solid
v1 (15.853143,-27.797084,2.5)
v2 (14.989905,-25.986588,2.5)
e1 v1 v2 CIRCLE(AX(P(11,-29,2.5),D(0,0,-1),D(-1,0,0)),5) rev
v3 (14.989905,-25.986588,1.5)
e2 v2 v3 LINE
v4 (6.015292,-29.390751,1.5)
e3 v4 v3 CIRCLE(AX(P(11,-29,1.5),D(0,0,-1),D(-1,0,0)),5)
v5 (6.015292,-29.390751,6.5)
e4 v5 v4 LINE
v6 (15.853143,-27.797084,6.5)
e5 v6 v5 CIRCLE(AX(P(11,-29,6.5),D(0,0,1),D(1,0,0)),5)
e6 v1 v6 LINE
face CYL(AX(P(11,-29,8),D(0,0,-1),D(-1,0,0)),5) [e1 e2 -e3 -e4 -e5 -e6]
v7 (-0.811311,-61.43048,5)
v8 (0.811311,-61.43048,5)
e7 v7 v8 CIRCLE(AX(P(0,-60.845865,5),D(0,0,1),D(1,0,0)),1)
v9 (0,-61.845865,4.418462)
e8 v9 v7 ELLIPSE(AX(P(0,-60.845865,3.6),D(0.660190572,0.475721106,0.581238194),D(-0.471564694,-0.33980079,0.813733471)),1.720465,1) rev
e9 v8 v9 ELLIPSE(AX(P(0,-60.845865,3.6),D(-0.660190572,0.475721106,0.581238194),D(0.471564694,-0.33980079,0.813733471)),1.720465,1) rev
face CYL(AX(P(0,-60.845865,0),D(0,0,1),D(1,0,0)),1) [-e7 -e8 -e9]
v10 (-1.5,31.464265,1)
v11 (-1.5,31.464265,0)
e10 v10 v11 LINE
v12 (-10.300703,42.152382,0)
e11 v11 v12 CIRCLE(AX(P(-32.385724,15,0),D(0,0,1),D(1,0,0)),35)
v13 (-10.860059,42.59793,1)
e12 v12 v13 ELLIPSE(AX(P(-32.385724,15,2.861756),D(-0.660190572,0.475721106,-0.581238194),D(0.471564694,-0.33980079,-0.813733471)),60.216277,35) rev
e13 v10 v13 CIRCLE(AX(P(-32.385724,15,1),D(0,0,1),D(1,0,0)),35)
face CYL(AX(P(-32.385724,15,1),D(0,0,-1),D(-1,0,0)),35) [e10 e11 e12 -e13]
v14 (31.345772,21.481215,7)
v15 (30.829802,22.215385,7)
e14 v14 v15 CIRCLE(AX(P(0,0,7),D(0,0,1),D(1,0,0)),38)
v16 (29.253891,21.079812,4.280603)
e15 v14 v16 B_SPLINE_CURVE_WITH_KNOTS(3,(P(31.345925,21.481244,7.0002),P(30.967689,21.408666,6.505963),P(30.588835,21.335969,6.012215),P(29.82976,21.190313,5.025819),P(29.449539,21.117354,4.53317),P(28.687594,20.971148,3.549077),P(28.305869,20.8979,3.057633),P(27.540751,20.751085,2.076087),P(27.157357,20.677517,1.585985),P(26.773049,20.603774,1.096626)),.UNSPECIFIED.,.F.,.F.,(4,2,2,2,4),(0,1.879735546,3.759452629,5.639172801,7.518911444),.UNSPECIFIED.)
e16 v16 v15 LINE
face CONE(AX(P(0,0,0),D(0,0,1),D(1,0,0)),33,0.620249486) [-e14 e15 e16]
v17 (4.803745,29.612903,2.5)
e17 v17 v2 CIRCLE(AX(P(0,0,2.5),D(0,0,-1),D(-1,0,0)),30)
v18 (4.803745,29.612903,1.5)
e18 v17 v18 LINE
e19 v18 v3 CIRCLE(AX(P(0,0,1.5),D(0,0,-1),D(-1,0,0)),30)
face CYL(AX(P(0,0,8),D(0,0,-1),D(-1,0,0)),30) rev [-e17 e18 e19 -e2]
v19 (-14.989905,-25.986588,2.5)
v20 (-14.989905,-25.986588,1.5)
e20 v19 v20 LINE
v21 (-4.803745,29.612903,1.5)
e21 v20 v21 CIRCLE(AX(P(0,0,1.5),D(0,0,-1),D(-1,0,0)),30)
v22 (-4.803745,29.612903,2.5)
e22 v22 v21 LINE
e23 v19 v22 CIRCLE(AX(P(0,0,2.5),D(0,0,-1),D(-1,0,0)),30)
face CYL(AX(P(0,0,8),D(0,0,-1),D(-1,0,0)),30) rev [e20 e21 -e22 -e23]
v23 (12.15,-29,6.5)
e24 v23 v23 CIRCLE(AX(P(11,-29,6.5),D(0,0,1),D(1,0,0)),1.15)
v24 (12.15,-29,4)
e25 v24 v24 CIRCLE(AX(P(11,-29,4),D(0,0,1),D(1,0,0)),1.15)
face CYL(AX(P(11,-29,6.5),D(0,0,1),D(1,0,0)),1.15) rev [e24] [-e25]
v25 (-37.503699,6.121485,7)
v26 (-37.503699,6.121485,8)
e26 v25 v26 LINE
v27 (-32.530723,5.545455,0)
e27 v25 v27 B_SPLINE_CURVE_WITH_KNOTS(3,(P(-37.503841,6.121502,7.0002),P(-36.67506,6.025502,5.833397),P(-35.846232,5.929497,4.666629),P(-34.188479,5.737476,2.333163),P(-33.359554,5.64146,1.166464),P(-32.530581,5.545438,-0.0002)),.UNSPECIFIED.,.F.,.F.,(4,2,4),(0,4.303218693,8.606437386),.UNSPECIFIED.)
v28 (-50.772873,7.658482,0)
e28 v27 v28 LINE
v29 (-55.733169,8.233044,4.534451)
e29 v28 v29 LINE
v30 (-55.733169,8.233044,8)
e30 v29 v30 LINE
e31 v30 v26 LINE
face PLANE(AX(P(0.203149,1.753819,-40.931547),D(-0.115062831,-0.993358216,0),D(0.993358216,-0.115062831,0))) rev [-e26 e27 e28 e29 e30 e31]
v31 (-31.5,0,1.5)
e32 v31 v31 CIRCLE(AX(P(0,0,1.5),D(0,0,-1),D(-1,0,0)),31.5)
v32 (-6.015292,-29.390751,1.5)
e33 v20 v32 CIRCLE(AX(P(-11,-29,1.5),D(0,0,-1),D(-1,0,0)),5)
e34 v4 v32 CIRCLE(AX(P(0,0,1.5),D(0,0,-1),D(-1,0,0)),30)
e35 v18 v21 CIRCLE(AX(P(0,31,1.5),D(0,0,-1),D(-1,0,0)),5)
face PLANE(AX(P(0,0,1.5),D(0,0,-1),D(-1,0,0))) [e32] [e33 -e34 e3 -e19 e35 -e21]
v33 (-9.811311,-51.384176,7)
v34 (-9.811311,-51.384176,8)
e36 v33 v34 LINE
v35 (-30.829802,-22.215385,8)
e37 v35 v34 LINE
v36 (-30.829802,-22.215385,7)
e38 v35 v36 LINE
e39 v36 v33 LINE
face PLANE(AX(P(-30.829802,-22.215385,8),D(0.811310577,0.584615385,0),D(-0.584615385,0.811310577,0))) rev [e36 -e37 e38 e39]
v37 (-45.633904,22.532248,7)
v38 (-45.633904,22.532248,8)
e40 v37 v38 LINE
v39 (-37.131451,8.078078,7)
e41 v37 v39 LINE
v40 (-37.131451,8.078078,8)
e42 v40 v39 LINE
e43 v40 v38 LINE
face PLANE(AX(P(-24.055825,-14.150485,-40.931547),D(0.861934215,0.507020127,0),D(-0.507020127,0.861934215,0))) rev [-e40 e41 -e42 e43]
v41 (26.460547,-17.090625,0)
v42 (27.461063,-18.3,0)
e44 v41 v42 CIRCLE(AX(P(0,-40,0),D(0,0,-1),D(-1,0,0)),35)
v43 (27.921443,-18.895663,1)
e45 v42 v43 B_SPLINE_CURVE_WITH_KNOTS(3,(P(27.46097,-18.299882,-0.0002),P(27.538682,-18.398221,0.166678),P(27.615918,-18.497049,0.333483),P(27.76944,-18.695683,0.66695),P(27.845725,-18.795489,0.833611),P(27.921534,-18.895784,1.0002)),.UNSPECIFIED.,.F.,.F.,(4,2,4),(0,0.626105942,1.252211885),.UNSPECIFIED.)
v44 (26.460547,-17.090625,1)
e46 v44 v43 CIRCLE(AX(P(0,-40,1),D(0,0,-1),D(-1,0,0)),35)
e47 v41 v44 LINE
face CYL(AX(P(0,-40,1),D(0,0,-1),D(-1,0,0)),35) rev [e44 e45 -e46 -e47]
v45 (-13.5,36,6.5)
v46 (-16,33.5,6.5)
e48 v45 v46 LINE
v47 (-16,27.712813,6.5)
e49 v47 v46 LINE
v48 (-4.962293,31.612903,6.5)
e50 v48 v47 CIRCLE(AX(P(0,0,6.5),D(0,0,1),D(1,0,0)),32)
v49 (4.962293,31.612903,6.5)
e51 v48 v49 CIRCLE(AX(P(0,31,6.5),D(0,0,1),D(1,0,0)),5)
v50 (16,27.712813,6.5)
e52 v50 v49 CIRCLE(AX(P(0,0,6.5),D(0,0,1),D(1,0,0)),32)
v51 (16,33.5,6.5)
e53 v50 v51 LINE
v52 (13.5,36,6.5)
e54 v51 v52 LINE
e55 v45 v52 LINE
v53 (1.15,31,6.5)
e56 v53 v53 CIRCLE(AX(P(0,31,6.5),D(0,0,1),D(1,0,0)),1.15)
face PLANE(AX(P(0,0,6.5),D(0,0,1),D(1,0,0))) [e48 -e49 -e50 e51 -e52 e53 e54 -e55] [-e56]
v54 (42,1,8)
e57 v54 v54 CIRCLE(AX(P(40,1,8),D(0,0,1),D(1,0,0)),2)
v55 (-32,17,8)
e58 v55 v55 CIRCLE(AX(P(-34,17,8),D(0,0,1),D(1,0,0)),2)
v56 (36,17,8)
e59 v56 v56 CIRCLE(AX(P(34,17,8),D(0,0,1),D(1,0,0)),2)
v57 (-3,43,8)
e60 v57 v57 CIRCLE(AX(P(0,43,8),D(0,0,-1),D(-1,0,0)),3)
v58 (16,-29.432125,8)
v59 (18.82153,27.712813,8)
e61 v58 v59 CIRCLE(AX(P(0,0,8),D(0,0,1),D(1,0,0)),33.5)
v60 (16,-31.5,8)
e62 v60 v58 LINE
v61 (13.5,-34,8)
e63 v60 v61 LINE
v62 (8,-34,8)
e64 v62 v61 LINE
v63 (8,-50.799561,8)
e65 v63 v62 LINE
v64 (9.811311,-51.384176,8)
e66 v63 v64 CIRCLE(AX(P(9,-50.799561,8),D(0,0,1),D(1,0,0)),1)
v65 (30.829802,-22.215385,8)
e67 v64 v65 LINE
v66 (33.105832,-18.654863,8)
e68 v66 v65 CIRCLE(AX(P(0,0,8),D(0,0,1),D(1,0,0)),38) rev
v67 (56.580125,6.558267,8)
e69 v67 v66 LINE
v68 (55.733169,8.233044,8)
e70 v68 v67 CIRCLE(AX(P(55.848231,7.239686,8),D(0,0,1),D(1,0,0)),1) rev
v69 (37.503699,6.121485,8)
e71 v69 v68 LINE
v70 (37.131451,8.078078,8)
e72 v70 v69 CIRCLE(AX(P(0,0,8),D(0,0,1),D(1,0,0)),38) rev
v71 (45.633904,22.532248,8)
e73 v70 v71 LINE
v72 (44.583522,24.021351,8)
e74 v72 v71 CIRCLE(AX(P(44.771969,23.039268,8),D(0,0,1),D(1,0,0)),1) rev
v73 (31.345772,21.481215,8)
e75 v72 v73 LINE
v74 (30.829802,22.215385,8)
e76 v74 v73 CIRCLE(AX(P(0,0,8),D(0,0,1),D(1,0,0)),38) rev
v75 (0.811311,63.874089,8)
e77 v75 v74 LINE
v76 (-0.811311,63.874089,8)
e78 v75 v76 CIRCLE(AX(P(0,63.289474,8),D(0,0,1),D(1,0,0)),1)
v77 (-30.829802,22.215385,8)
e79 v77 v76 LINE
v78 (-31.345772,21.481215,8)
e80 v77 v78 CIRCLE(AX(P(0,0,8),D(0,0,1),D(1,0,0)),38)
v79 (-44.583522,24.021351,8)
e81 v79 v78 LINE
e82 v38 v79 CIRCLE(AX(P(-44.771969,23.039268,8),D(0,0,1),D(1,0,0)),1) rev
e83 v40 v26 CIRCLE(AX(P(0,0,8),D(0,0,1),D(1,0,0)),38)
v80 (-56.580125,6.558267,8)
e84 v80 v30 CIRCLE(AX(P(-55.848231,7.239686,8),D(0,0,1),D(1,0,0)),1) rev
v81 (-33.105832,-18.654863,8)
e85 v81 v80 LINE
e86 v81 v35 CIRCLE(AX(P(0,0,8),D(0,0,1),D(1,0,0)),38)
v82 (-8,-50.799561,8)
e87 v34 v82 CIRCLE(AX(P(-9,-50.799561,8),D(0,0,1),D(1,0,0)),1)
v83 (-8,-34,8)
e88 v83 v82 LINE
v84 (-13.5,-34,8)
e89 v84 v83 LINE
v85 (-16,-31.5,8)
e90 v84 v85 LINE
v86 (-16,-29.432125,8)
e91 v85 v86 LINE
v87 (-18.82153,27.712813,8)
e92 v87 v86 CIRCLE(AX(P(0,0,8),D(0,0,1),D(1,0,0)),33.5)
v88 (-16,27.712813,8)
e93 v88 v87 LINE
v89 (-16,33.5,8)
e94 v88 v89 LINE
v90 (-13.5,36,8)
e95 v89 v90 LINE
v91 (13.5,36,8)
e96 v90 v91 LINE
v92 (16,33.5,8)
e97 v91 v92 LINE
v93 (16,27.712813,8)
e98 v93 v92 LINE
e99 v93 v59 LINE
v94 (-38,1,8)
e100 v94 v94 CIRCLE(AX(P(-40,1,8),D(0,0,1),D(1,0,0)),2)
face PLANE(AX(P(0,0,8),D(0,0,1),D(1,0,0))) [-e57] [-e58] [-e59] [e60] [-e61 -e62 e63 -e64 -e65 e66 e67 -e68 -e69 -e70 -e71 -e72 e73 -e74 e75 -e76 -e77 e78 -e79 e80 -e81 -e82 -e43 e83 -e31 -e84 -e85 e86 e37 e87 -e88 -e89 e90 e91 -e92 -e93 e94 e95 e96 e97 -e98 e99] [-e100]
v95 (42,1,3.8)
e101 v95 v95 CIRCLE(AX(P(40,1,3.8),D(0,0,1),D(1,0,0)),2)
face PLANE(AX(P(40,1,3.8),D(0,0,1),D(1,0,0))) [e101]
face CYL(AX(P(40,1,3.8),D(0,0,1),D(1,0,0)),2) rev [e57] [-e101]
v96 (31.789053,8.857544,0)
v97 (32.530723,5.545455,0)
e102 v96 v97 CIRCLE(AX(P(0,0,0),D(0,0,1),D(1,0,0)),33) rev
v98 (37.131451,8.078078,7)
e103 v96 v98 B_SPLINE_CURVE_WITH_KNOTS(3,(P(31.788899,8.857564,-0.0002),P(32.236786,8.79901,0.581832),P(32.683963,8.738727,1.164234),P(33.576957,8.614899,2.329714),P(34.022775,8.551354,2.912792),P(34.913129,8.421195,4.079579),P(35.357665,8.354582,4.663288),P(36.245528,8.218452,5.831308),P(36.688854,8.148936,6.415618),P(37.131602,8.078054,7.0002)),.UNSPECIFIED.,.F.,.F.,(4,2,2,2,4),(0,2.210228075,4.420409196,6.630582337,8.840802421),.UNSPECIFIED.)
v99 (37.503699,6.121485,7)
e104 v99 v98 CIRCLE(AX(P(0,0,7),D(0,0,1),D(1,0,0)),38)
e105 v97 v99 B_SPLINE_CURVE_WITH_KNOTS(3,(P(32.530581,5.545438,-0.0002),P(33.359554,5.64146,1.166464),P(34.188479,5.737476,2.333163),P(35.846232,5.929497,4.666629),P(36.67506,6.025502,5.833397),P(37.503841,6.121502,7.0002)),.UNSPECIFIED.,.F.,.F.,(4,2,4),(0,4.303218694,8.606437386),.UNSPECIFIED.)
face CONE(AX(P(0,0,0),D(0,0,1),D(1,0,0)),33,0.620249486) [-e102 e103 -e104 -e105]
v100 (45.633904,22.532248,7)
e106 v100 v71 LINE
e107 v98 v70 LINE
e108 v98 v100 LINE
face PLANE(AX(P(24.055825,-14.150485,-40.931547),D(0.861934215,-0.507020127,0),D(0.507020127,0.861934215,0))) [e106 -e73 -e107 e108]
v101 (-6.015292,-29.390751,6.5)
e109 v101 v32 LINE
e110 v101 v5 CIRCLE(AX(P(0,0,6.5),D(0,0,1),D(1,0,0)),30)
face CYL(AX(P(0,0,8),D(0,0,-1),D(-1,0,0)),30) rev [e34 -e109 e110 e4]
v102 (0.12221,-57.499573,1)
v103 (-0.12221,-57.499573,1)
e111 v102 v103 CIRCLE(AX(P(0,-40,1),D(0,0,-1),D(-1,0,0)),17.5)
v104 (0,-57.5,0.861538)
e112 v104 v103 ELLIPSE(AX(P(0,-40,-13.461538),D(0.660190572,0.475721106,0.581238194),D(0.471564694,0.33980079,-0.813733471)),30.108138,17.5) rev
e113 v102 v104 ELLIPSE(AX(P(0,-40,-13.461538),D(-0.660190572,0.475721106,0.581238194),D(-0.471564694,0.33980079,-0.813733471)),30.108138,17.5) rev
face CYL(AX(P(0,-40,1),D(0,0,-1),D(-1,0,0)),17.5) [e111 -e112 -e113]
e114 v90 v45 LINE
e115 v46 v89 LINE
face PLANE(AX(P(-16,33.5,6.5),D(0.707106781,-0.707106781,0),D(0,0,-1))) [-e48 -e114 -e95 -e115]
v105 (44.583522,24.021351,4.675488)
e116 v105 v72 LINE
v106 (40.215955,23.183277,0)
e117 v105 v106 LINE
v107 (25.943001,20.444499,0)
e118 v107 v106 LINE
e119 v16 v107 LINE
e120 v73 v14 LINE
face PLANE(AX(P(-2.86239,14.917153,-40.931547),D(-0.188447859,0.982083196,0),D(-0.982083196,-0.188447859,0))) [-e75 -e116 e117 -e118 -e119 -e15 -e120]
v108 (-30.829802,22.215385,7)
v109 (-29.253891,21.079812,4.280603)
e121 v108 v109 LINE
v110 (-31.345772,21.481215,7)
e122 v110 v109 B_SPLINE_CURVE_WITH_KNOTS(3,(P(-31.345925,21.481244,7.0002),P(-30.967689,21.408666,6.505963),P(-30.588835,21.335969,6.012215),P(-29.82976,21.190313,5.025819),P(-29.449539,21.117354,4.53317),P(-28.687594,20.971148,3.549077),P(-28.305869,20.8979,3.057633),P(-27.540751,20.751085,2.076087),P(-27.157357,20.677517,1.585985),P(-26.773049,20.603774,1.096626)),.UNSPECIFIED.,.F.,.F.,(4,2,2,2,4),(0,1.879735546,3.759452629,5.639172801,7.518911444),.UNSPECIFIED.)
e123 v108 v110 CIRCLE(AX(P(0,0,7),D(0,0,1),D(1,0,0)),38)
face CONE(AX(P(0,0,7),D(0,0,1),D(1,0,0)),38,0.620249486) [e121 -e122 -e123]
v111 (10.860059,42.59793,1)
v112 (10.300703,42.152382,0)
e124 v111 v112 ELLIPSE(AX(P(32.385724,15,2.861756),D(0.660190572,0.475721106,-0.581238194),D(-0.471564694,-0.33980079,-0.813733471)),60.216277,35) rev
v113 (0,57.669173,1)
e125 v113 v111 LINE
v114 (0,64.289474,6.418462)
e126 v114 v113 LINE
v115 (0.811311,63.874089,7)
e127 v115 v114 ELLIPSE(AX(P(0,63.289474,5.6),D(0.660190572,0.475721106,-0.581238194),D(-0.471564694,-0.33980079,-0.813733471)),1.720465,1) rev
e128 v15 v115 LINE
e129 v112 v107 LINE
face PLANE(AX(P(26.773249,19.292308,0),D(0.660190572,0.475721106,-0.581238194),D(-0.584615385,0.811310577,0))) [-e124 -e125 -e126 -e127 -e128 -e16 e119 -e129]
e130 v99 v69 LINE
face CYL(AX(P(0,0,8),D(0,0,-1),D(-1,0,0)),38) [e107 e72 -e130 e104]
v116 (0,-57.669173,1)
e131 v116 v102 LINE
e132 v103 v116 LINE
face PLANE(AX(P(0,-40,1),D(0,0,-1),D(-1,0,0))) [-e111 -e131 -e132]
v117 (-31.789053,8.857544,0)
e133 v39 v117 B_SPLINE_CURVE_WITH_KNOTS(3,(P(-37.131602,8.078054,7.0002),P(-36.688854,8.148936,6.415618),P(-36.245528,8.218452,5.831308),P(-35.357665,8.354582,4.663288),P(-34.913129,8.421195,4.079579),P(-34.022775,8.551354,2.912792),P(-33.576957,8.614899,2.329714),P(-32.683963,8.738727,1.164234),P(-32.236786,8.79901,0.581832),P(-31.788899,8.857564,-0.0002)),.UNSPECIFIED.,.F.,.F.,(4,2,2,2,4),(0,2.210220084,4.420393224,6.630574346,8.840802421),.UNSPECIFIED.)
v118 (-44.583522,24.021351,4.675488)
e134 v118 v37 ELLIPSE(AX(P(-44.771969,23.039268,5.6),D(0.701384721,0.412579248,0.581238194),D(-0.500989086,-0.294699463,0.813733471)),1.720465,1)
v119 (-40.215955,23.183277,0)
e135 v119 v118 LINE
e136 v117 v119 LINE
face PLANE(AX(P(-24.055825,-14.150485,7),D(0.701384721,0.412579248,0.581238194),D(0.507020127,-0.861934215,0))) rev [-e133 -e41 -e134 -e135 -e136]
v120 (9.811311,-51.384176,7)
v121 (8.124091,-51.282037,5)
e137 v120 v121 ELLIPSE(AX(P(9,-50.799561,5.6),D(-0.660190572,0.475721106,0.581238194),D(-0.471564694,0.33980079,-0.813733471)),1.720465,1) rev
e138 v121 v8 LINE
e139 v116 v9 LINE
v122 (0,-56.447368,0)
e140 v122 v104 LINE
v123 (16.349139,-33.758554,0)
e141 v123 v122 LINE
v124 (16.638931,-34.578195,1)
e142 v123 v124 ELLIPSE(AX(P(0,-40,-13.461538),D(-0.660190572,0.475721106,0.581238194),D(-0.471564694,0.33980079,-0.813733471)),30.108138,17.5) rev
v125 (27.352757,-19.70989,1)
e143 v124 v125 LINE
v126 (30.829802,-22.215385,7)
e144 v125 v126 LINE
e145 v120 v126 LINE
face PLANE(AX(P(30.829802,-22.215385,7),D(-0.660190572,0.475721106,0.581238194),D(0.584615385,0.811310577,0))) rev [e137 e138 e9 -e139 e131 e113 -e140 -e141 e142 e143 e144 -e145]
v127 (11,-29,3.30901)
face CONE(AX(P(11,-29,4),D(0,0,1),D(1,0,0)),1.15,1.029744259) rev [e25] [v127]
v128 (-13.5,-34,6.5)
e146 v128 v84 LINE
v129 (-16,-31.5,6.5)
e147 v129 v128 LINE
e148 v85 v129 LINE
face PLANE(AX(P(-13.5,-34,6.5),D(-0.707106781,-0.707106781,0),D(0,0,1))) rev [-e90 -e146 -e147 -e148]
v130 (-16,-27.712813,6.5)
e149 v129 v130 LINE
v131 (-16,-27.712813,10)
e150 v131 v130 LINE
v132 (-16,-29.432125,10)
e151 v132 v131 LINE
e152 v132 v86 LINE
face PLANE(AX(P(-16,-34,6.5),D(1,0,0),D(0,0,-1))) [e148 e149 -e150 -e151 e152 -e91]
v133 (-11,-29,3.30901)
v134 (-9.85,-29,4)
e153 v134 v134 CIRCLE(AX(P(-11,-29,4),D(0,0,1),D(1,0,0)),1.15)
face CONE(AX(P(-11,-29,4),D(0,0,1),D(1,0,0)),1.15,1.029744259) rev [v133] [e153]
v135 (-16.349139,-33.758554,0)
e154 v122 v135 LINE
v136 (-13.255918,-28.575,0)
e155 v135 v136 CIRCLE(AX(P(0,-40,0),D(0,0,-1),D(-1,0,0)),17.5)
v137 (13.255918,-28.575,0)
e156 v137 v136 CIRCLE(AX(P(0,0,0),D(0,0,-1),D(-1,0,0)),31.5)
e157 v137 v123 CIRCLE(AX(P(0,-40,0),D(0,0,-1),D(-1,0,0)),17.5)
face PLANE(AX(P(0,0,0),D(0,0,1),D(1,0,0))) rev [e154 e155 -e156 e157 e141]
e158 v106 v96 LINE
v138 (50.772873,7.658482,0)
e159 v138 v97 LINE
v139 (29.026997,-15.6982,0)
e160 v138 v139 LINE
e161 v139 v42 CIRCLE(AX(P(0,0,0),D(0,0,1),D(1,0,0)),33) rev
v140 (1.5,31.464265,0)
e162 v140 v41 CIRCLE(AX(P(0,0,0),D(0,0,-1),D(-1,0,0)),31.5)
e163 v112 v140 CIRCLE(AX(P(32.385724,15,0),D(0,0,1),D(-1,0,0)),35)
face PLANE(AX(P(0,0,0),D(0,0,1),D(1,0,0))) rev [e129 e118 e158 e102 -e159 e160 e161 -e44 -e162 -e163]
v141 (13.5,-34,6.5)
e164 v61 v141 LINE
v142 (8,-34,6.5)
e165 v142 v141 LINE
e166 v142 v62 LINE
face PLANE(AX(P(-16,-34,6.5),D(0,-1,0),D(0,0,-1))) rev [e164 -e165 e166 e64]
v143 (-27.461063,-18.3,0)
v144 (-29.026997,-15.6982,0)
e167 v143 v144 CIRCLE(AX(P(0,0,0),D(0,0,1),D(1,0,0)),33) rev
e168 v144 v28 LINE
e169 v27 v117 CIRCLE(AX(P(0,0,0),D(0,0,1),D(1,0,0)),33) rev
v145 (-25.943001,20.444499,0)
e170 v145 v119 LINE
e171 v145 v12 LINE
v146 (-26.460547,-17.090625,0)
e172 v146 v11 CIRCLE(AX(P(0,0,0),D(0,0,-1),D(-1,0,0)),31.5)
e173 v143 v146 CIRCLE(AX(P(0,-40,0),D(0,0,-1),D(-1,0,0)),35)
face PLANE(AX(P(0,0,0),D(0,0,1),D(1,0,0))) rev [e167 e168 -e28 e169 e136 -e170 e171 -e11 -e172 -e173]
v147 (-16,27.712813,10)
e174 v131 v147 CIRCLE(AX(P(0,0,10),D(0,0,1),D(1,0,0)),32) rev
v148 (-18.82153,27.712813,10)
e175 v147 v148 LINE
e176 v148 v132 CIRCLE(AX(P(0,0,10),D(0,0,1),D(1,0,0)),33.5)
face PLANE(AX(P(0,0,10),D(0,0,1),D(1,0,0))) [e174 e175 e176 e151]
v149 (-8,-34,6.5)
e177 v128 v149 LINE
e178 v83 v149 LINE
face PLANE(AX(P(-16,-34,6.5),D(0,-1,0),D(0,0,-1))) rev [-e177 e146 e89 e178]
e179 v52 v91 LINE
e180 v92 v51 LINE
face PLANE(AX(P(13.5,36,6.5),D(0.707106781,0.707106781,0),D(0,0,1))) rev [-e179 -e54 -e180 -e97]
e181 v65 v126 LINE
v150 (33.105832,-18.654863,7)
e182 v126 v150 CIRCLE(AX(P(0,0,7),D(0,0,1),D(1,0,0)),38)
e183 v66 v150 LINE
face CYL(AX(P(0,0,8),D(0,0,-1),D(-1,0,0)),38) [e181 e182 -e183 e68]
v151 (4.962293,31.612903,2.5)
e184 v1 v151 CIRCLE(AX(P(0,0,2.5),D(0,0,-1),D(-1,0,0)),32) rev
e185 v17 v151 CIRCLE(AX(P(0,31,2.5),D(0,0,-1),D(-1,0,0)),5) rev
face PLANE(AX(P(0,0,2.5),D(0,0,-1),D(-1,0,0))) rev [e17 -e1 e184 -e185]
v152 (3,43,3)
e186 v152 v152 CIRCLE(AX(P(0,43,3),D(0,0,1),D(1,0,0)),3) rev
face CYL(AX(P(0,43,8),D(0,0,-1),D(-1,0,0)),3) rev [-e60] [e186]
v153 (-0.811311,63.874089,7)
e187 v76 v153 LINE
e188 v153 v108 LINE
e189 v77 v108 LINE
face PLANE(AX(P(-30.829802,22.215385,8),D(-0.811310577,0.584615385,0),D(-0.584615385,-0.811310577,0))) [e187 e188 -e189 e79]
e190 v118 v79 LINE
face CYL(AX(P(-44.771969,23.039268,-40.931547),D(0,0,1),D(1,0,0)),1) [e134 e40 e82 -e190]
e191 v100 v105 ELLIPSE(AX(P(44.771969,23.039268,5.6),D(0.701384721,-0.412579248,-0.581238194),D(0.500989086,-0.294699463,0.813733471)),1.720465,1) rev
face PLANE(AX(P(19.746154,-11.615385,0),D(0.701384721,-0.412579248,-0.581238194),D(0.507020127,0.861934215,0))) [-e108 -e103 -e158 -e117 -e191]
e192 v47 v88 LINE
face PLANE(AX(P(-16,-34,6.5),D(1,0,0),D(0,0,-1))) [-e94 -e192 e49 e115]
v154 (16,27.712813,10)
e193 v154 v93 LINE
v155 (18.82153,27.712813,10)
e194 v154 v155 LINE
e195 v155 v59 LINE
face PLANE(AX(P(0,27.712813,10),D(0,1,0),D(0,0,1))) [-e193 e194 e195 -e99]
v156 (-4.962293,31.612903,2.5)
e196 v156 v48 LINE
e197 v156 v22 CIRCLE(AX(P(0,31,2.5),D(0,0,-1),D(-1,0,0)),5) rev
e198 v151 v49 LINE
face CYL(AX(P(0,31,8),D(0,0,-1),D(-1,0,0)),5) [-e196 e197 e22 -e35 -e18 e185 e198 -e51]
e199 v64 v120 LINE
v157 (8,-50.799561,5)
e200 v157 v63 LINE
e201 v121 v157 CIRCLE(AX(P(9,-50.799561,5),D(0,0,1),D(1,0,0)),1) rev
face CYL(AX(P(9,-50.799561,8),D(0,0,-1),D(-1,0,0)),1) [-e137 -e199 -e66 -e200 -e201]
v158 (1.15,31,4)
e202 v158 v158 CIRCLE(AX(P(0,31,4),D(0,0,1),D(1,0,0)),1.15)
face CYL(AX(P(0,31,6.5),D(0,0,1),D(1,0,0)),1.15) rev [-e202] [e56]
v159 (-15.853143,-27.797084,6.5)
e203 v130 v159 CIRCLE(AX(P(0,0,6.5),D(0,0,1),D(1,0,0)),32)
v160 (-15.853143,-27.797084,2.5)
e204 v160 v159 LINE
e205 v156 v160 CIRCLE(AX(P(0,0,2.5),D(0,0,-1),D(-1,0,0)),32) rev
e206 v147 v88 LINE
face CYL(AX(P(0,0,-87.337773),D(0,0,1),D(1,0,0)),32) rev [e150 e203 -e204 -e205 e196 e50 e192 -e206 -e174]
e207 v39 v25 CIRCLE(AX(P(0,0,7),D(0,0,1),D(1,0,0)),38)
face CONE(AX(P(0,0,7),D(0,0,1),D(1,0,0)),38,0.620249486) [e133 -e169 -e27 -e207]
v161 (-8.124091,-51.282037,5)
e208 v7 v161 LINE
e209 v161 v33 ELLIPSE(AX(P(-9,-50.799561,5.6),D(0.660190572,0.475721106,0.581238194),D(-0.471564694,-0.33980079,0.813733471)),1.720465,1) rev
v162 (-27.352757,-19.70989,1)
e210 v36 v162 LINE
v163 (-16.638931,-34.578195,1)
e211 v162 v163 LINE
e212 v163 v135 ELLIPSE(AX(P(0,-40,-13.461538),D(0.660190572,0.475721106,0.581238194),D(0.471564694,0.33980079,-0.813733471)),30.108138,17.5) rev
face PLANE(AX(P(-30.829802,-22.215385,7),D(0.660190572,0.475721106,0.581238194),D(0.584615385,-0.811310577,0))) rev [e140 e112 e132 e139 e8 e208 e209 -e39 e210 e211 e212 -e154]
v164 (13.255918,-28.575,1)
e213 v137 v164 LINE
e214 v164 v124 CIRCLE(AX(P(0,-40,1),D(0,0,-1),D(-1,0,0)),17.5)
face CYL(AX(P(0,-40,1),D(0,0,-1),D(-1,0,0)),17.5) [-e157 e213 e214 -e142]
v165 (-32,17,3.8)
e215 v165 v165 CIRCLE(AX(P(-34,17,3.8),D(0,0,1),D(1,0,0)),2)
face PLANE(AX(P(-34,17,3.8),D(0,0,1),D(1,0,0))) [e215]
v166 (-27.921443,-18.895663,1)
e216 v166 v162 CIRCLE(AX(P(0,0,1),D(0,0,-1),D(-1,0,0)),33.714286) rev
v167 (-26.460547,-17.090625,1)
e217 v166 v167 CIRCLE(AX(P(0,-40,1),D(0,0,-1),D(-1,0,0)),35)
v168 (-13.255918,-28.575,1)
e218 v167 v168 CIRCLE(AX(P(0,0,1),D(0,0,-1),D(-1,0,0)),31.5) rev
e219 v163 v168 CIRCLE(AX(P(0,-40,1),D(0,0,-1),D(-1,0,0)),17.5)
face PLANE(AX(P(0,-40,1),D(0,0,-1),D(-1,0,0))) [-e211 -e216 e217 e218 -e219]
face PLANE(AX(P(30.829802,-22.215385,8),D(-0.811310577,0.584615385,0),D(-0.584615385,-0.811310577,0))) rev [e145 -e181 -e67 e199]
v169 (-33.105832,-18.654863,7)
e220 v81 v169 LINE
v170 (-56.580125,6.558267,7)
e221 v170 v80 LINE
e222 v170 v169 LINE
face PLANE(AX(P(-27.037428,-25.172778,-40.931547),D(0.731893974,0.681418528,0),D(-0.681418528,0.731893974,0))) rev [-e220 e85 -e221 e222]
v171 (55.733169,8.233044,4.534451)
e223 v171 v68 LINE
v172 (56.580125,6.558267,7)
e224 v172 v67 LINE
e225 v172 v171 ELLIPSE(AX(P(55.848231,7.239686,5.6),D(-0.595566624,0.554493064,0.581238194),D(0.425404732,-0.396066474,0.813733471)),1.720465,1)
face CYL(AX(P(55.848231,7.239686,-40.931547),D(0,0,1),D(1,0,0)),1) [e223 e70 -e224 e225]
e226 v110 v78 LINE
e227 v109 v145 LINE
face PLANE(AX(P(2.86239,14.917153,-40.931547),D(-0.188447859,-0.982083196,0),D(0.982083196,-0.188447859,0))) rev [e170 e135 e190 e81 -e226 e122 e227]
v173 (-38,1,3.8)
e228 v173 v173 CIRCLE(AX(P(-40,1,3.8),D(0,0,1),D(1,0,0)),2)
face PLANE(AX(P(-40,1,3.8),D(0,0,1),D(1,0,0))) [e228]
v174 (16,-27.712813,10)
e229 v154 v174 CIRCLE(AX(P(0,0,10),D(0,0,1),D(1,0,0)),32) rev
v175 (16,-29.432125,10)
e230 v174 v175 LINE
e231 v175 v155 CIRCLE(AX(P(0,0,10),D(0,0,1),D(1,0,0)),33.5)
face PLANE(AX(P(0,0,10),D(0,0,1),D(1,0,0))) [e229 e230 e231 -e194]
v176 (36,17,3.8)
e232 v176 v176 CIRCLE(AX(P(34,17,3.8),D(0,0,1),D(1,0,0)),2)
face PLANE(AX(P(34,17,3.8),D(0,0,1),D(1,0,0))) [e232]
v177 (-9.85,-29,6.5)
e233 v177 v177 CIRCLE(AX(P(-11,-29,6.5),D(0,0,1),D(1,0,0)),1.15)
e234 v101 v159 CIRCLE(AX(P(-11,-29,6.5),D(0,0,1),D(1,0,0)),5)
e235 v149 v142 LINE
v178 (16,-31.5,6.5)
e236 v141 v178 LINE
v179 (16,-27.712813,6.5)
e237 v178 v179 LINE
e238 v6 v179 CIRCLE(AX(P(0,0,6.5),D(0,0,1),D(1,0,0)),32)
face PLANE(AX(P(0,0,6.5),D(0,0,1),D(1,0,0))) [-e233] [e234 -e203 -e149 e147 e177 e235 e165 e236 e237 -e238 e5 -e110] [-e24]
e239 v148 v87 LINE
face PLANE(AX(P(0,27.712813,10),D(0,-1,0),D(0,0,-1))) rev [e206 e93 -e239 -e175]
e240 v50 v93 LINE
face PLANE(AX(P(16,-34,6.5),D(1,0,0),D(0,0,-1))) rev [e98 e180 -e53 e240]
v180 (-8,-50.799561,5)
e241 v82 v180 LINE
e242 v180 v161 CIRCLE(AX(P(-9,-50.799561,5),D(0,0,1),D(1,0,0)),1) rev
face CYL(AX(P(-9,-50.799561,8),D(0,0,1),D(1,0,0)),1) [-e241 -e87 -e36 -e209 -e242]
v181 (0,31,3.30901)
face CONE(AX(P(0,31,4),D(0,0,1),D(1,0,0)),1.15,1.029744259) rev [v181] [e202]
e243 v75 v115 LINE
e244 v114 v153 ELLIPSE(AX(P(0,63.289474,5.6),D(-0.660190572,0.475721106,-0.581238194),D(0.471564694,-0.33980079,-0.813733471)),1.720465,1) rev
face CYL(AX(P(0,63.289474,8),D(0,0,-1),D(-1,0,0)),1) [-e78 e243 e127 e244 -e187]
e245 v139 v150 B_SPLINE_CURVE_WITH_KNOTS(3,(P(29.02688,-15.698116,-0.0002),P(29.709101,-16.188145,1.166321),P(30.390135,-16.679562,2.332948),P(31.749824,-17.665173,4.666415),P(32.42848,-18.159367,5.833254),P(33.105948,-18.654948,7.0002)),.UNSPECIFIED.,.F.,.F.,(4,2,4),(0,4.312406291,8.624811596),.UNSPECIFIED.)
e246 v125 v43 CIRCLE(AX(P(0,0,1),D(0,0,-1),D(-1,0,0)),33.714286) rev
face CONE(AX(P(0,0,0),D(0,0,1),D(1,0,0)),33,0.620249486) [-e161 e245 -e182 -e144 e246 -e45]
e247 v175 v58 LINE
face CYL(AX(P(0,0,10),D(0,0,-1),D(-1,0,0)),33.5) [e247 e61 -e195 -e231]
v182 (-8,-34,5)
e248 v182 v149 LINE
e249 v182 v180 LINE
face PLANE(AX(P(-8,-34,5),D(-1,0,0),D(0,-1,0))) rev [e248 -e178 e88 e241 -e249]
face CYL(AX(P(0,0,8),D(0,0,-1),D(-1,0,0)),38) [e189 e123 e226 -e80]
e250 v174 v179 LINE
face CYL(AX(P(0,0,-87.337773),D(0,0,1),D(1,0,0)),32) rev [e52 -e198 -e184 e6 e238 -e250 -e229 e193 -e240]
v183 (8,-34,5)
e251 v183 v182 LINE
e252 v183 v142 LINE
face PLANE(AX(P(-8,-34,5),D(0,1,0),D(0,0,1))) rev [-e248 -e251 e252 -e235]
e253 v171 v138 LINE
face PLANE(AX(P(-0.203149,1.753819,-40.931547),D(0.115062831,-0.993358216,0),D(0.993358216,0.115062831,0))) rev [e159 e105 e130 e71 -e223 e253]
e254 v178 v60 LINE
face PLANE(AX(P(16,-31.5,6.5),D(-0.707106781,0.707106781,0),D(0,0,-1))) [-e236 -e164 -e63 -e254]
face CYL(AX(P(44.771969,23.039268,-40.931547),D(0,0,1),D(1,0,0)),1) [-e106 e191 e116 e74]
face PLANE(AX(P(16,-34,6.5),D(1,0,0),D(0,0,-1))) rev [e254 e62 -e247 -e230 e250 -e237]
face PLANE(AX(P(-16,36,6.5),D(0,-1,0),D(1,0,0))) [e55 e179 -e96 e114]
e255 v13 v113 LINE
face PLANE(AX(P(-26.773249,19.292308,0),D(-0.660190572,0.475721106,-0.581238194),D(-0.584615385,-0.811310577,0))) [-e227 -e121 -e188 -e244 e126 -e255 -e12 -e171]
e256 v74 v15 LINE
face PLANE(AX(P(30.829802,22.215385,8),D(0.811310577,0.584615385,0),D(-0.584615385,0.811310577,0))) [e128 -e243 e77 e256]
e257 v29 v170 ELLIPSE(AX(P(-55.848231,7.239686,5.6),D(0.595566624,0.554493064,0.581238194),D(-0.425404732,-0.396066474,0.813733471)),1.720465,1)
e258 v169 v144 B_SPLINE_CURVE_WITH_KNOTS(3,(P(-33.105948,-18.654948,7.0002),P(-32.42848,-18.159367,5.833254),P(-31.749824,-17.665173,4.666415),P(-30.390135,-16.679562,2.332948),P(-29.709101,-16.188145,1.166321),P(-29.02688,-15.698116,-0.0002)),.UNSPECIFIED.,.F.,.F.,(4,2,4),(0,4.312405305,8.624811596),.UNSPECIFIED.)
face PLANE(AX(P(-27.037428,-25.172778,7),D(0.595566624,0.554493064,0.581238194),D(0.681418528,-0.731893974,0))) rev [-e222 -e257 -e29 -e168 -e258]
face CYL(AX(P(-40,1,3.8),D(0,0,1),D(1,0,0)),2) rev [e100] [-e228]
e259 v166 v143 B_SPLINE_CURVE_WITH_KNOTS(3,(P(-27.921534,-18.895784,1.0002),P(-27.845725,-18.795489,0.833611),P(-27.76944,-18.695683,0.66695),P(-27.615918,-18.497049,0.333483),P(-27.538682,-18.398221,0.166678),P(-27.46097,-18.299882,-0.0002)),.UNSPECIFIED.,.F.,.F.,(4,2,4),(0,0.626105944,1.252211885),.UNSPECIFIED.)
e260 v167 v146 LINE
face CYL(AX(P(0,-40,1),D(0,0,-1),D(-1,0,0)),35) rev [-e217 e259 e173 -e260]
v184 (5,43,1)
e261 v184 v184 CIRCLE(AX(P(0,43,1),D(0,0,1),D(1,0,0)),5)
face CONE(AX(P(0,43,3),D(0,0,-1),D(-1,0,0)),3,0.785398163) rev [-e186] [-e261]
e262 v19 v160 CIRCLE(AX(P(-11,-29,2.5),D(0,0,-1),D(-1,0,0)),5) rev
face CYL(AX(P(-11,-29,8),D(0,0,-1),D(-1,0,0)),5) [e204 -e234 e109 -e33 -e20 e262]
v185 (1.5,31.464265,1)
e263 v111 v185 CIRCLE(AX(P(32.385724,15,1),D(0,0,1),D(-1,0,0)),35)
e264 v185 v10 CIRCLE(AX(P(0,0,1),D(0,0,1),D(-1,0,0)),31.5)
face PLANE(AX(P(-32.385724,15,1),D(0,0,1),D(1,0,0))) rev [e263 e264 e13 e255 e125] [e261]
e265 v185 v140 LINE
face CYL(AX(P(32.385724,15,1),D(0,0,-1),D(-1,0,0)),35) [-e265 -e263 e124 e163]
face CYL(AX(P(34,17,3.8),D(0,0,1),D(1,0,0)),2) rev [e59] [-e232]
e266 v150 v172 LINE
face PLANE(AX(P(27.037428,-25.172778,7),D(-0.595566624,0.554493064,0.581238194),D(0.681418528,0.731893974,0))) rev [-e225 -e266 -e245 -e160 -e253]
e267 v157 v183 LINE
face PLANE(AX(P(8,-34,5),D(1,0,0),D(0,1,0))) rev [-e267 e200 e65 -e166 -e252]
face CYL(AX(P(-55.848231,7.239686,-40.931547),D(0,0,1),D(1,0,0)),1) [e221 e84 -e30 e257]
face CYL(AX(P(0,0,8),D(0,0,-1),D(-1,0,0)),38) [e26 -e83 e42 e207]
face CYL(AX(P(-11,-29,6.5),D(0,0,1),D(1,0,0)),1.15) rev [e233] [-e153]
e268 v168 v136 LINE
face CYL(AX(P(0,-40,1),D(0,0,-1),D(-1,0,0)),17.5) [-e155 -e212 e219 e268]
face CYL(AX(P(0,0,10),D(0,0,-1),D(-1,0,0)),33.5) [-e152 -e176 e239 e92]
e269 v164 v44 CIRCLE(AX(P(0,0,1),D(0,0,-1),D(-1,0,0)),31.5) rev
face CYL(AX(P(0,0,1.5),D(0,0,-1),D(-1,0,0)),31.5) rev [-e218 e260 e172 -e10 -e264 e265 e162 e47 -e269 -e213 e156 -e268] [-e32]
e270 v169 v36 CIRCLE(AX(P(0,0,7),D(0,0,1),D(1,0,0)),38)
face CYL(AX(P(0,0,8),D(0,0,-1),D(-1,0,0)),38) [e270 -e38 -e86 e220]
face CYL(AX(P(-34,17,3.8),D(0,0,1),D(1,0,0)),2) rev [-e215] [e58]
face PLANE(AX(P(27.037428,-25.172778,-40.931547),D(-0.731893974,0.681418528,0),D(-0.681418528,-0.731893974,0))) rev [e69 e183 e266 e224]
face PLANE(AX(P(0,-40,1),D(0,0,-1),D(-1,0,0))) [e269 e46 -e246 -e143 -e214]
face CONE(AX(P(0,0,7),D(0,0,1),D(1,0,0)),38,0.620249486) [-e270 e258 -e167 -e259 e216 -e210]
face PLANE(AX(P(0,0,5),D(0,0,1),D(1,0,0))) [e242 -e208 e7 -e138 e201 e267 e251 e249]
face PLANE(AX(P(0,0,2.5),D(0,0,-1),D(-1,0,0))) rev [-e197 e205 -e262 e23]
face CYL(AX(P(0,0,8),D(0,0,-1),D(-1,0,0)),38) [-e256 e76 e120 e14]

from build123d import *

# Parameters (mm, degrees)
EXTRUDE_1_DEPTH           = 8
CHAMFER_12_SIZE           = 7
CHAMFER_12_SIZE_2         = 5
SKETCH_11_R               = 31.5
CUT_EXTRUDE_1_DEPTH       = 1.5
EXTRUDE_5_DEPTH           = 8
EXTRUDE_5_2_DEPTH         = 8
EXTRUDE_5_3_DEPTH         = 8
EXTRUDE_5_4_DEPTH         = 8
CHAMFER_13_SIZE           = 7
CHAMFER_13_SIZE_2         = 5
CHAMFER_14_SIZE           = 7
CHAMFER_14_SIZE_2         = 5
CHAMFER_15_SIZE           = 7
CHAMFER_15_SIZE_2         = 5
CHAMFER_16_SIZE           = 7
CHAMFER_16_SIZE_2         = 5
SKETCH_23_W               = 32
SKETCH_23_H               = 70
CUT_EXTRUDE_7_DEPTH       = 1.5
SKETCH_13_W               = 16
SKETCH_13_H               = 31
CUT_EXTRUDE_2_DEPTH       = 3
HOLE_WIZARD_M2_25_D       = 2.3
HOLE_WIZARD_M2_25_DEPTH   = 2.5
HOLE_WIZARD_M2_25_TIP     = 0.690989712
CUT_EXTRUDE_START         = -5.5
CUT_EXTRUDE_12_DEPTH      = 5.5
CHAMFER_19_SIZE           = 2.5
CUT_EXTRUDE_9_DEPTH       = 1
SKETCH_15_R               = 35
SKETCH_15_R_2             = 17.5
CUT_EXTRUDE_10_DEPTH      = 1
FILLET_1_R                = 1
CUT_EXTRUDE_13_DEPTH      = 86.964282311
CUT_EXTRUDE_14_DEPTH      = 87.10376201
CUT_EXTRUDE_14_DEPTH_BACK = 87.10376201
SKETCH_37_R               = 3
CHAMFER_20_SIZE           = 2
SKETCH_29_R               = 2
CUT_EXTRUDE_15_DEPTH      = 4.2
EXTRUDE_6_DEPTH           = 2


# Read off the part's stored shape, not the designer's step: Вырез-Вытянуть12
with BuildPart() as part:
    # Эскиз1 → Бобышка-Вытянуть1 (new body)
    with BuildSketch(Plane.XY):
        with BuildLine():
            Line((30.829801919, 22.215384615), (0.811310577, 63.874089069))
            ThreePointArc((0.811310577, 63.874089069), (0, 64.289473684), (-0.811310577, 63.874089069))
            Line((-0.811310577, 63.874089069), (-30.829801919, 22.215384615))
            ThreePointArc((-30.829801919, 22.215384615), (-38, 0), (-30.829801919, -22.215384615))
            Line((-30.829801919, -22.215384615), (-0.811310577, -63.874089069))
            ThreePointArc((-0.811310577, -63.874089069), (0, -64.289473684), (0.811310577, -63.874089069))
            Line((0.811310577, -63.874089069), (30.829801919, -22.215384615))
            ThreePointArc((30.829801919, -22.215384615), (38, 0), (30.829801919, 22.215384615))
        make_face()
        with BuildLine():
            ThreePointArc((4.803744637, 29.612903226), (29.508862916, 5.406201012), (14.989905463, -25.986587583))
            ThreePointArc((14.989905463, -25.986587583), (9.226728829, -24.325012368), (6.015292042, -29.390751294))
            ThreePointArc((6.015292042, -29.390751294), (0, -30), (-6.015292042, -29.390751294))
            ThreePointArc((-6.015292042, -29.390751294), (-9.226728829, -24.325012368), (-14.989905463, -25.986587583))
            ThreePointArc((-14.989905463, -25.986587583), (-29.508862916, 5.406201012), (-4.803744637, 29.612903226))
            ThreePointArc((-4.803744637, 29.612903226), (0, 26), (4.803744637, 29.612903226))
        make_face(mode=Mode.SUBTRACT)
    extrude(amount=EXTRUDE_1_DEPTH)

    # Фаска12
    # the kernel refuses this chamfer: 7, 5 mm, written as the material it takes off along each edge
    with BuildSketch(Plane(origin=(-30.829801919, -22.215384615, 0), x_dir=(-0.018263348031143992, -0.013160230543711323, 0.9997465971188547), z_dir=(0.5846153846153845, -0.8113105768267822, 0)), Plane(origin=(-9.755140998, -78.537873409, 0), x_dir=(0.018263348031144277, -0.013160230543711529, 0.9997465971188547), z_dir=(0.5846153846153846, 0.8113105768267822, 0)), Plane(origin=(9.755140998, 78.537873409, 0), x_dir=(-0.018263348031144155, 0.013160230543711439, 0.9997465971188547), z_dir=(-0.5846153846153846, -0.8113105768267822, 0)), Plane(origin=(30.829801919, 22.215384615, 0), x_dir=(0.018263348031143992, 0.013160230543711323, 0.9997465971188547), z_dir=(-0.5846153846153846, 0.8113105768267822, 0))) as chamfer_12_piece_1:
        Polygon((CHAMFER_12_SIZE * 0.999746597119, -CHAMFER_12_SIZE * 0.0225109206669), (-CHAMFER_12_SIZE_2 * 0.0225109206669, -CHAMFER_12_SIZE_2 * 0.999746597119), (0, 0), align=None)
    extrude(amount=69.421612884, mode=Mode.SUBTRACT)
    with BuildSketch(Plane(origin=(0, 0, 0), x_dir=(0.8113105768267822, -0.5846153846153845, 0), z_dir=(-0.5846153846153845, -0.8113105768267822, 0))) as chamfer_12_piece_2:
        Polygon((38, CHAMFER_12_SIZE), (38 - CHAMFER_12_SIZE_2, 0), (38, 0), align=None)
    revolve(axis=Axis((0, 0, 0), (0, 0, 1)), revolution_arc=71.551646689, mode=Mode.SUBTRACT)
    with BuildSketch(Plane(origin=(0, 0, 0), x_dir=(-0.8113105768267815, 0.5846153846153852, 0), z_dir=(0.5846153846153852, 0.8113105768267815, 0))) as chamfer_12_piece_3:
        Polygon((38, CHAMFER_12_SIZE), (38 - CHAMFER_12_SIZE_2, 0), (38, 0), align=None)
    revolve(axis=Axis((0, 0, 0), (0, 0, 1)), revolution_arc=71.551646689, mode=Mode.SUBTRACT)

    # Эскиз11 → Вырез-Вытянуть1 (cut)
    with BuildSketch(Plane(origin=(0, 0, 0), x_dir=(-1, 0, 0), z_dir=(0, 0, -1))):
        Circle(SKETCH_11_R)
    extrude(amount=-CUT_EXTRUDE_1_DEPTH, mode=Mode.SUBTRACT)


with BuildPart() as body_2:
    # Эскиз17 → Бобышка-Вытянуть5 (new body)
    with BuildSketch(Plane(origin=(0, 0, 8), x_dir=(-1, 0, 0), z_dir=(0, 0, -1))):
        with BuildLine():
            Line((27.658633372, -18), (31.430265195, -20.454545455))
            Line((31.430265195, -20.454545455), (56.580125307, 6.558267258))
            ThreePointArc((56.580125307, 6.558267258), (56.740609868, 7.690973443), (55.733168502, 8.233044002))
            Line((55.733168502, 8.233044002), (32.530722923, 5.545454545))
            ThreePointArc((32.530722923, 5.545454545), (32.315426041, -6.686795927), (27.658633372, -18))
        make_face()
    extrude(amount=EXTRUDE_5_DEPTH)

    # Фаска13
    # the kernel refuses this chamfer: 7, 5 mm, written as the material it takes off along each edge
    with BuildSketch(Plane(origin=(-19.114174879, -33.682938757, 0), x_dir=(-0.016475607194987148, -0.015339358422919067, 0.9997465971188547), z_dir=(-0.6814185279188429, 0.7318939744313498, 0))) as chamfer_13_piece_1:
        Polygon((CHAMFER_13_SIZE * 0.999746597119, CHAMFER_13_SIZE * 0.0225109206669), (-CHAMFER_13_SIZE_2 * 0.0225109206669, CHAMFER_13_SIZE_2 * 0.999746597119), (0, 0), align=None)
    extrude(amount=73.056482477, mode=Mode.SUBTRACT)


with BuildPart() as body_3:
    # Эскиз17 → Extrude 5 2 (new body)
    with BuildSketch(Plane(origin=(0, 0, 8), x_dir=(-1, 0, 0), z_dir=(0, 0, -1))):
        with BuildLine():
            Line((-31.430265195, -20.454545455), (-27.658633372, -18))
            ThreePointArc((-27.658633372, -18), (-32.315426041, -6.686795927), (-32.530722923, 5.545454545))
            Line((-32.530722923, 5.545454545), (-55.733168502, 8.233044002))
            ThreePointArc((-55.733168502, 8.233044002), (-56.740609868, 7.690973443), (-56.580125307, 6.558267258))
            Line((-56.580125307, 6.558267258), (-31.430265195, -20.454545455))
        make_face()
    extrude(amount=EXTRUDE_5_2_DEPTH)

    # Фаска14
    # the kernel refuses this chamfer: 7, 5 mm, written as the material it takes off along each edge
    with BuildSketch(Plane(origin=(68.896215623, 19.786660561, 0), x_dir=(0.016475607194987654, -0.01533935842291954, 0.9997465971188547), z_dir=(-0.6814185279188428, -0.7318939744313497, 0))) as chamfer_14_piece_1:
        Polygon((CHAMFER_14_SIZE * 0.999746597119, CHAMFER_14_SIZE * 0.0225109206669), (-CHAMFER_14_SIZE_2 * 0.0225109206669, CHAMFER_14_SIZE_2 * 0.999746597119), (0, 0), align=None)
    extrude(amount=73.056482477, mode=Mode.SUBTRACT)


with BuildPart() as body_4:
    # Эскиз17 → Extrude 5 3 (new body)
    with BuildSketch(Plane(origin=(0, 0, 8), x_dir=(-1, 0, 0), z_dir=(0, 0, -1))):
        with BuildLine():
            ThreePointArc((25.909216128, 20.438016529), (29.943619234, 13.870099754), (32.34435074, 6.545454545))
            Line((32.34435074, 6.545454545), (36.754944023, 7.438016529))
            Line((36.754944023, 7.438016529), (45.633903711, 22.532247998))
            ThreePointArc((45.633903711, 22.532247998), (45.589131135, 23.615676709), (44.583521637, 24.021351321))
            Line((44.583521637, 24.021351321), (25.909216128, 20.438016529))
        make_face()
    extrude(amount=EXTRUDE_5_3_DEPTH)

    # Фаска16
    # the kernel refuses this chamfer: 7, 5 mm, written as the material it takes off along each edge
    with BuildSketch(Plane(origin=(-27.590964156, -8.140749245, 0), x_dir=(-0.01940293273748138, -0.01141348984557729, 0.9997465971188547), z_dir=(-0.5070201265633941, 0.8619342151577695, 0))) as chamfer_16_piece_1:
        Polygon((CHAMFER_16_SIZE * 0.999746597119, CHAMFER_16_SIZE * 0.0225109206669), (-CHAMFER_16_SIZE_2 * 0.0225109206669, CHAMFER_16_SIZE_2 * 0.999746597119), (0, 0), align=None)
    extrude(amount=53.660432785, mode=Mode.SUBTRACT)


with BuildPart() as body_5:
    # Эскиз17 → Extrude 5 4 (new body)
    with BuildSketch(Plane(origin=(0, 0, 8), x_dir=(-1, 0, 0), z_dir=(0, 0, -1))):
        with BuildLine():
            Line((-36.754944023, 7.438016529), (-32.34435074, 6.545454545))
            ThreePointArc((-32.34435074, 6.545454545), (-29.943619234, 13.870099754), (-25.909216128, 20.438016529))
            Line((-25.909216128, 20.438016529), (-44.583521637, 24.021351321))
            ThreePointArc((-44.583521637, 24.021351321), (-45.589131135, 23.615676709), (-45.633903711, 22.532247998))
            Line((-45.633903711, 22.532247998), (-36.754944023, 7.438016529))
        make_face()
    extrude(amount=EXTRUDE_5_4_DEPTH)

    # Фаска15
    # the kernel refuses this chamfer: 7, 5 mm, written as the material it takes off along each edge
    with BuildSketch(Plane(origin=(54.797883578, 38.111013772, 0), x_dir=(0.01940293273748127, -0.011413489845577225, 0.9997465971188547), z_dir=(-0.5070201265633941, -0.8619342151577695, 0))) as chamfer_15_piece_1:
        Polygon((CHAMFER_15_SIZE * 0.999746597119, CHAMFER_15_SIZE * 0.0225109206669), (-CHAMFER_15_SIZE_2 * 0.0225109206669, CHAMFER_15_SIZE_2 * 0.999746597119), (0, 0), align=None)
    extrude(amount=53.660432785, mode=Mode.SUBTRACT)


with BuildPart() as body_2_1:
    add(body_2.part)

    # Combine 2: union body 3, body 5, body 4, part
    add(body_3.part)
    add(body_5.part)
    add(body_4.part)
    add(part.part)

    # Эскиз23 → Вырез-Вытянуть7 (cut)
    with BuildSketch(Plane.XY.offset(8)):
        with Locations((0, 1)):
            Rectangle(SKETCH_23_W, SKETCH_23_H)
    extrude(amount=-CUT_EXTRUDE_7_DEPTH, mode=Mode.SUBTRACT)

    # Эскиз13 → Вырез-Вытянуть2 (cut)
    with BuildSketch(Plane.XY.offset(8)):
        with Locations((0, -49.5)):
            Rectangle(SKETCH_13_W, SKETCH_13_H)
    extrude(amount=-CUT_EXTRUDE_2_DEPTH, mode=Mode.SUBTRACT)

    # Hole Wizard M2.25
    with Locations(Plane.XY.offset(6.5)):
        with Locations((0, 31), (-11, -29), (11, -29)):
            Hole(HOLE_WIZARD_M2_25_D / 2, depth=HOLE_WIZARD_M2_25_DEPTH)
            with Locations((0, 0, -(HOLE_WIZARD_M2_25_DEPTH + HOLE_WIZARD_M2_25_TIP / 2))):  # 118° drill point
                Cone(0, HOLE_WIZARD_M2_25_D / 2, HOLE_WIZARD_M2_25_TIP, mode=Mode.SUBTRACT)

    # Вырез-Вытянуть12 outline → Вырез-Вытянуть12 (cut)
    with BuildSketch(Plane.XY.offset(8).offset(CUT_EXTRUDE_START)):
        with BuildLine():
            ThreePointArc((14.989905463, -25.986587583), (15.513241495, -26.848105205), (15.853142564, -27.797083855))
            ThreePointArc((15.853142564, -27.797083855), (31.475502035, 5.769988875), (4.96229278, 31.612903226))
            ThreePointArc((4.96229278, 31.612903226), (4.984362718, 30.604869274), (4.803744637, 29.612903226))
            ThreePointArc((4.803744637, 29.612903226), (29.508862916, 5.406201012), (14.989905463, -25.986587583))
        make_face()
        with BuildLine():
            ThreePointArc((-4.803744637, 29.612903226), (-4.984362718, 30.604869274), (-4.96229278, 31.612903226))
            ThreePointArc((-4.96229278, 31.612903226), (-31.475502035, 5.769988875), (-15.853142564, -27.797083855))
            ThreePointArc((-15.853142564, -27.797083855), (-15.513241495, -26.848105205), (-14.989905463, -25.986587583))
            ThreePointArc((-14.989905463, -25.986587583), (-29.508862916, 5.406201012), (-4.803744637, 29.612903226))
        make_face()
    extrude(amount=CUT_EXTRUDE_12_DEPTH, mode=Mode.SUBTRACT)

    # Фаска19
    chamfer_19_edges = [body_2_1.edges().sort_by_distance(p)[0] for p in [
        (-16, -34, 7.25),
        (16, -34, 7.25),
        (-16, 36, 7.25),
        (16, 36, 7.25),
    ]]
    chamfer(chamfer_19_edges, length=CHAMFER_19_SIZE)

    # Эскиз18 → Вырез-Вытянуть9 (cut)
    with BuildSketch(Plane(origin=(0, 0, 0), x_dir=(-1, 0, 0), z_dir=(0, 0, -1))):
        with BuildLine():
            Line((-14.395430735, 45.022480556), (0, 60))
            Line((0, 60), (14.395430735, 45.022480556))
            ThreePointArc((14.395430735, 45.022480556), (7.024876919, 39.121099102), (1.5, 31.464265445))
            ThreePointArc((1.5, 31.464265445), (0, 31.5), (-1.5, 31.464265445))
            ThreePointArc((-1.5, 31.464265445), (-7.024876919, 39.121099102), (-14.395430735, 45.022480556))
        make_face()
    extrude(amount=-CUT_EXTRUDE_9_DEPTH, mode=Mode.SUBTRACT)

    # Эскиз15 → Вырез-Вытянуть10 (cut)
    with BuildSketch(Plane(origin=(0, 0, 0), x_dir=(-1, 0, 0), z_dir=(0, 0, -1))):
        with Locations((0, -40)):
            Circle(SKETCH_15_R)
        with Locations((0, -40)):
            Circle(SKETCH_15_R_2, mode=Mode.SUBTRACT)
    extrude(amount=-CUT_EXTRUDE_10_DEPTH, mode=Mode.SUBTRACT)

    # Скругление1
    fillet_1_edges = [body_2_1.edges().sort_by_distance(p)[0] for p in [
        (8, -53.897855264, 7.5),
        (-8, -53.897855264, 7.5),
    ]]
    fillet(fillet_1_edges, radius=FILLET_1_R)

    # Эскиз36 → Вырез-Вытянуть13 (cut, through all)
    with BuildSketch(Plane.XY.offset(5)):
        with BuildLine():
            Line((-0.811310577, -61.430480046), (0, -62.556390977))
            Line((0, -62.556390977), (0.811310577, -61.430480046))
            ThreePointArc((0.811310577, -61.430480046), (0, -61.845864662), (-0.811310577, -61.430480046))
        make_face()
    extrude(amount=-CUT_EXTRUDE_13_DEPTH, mode=Mode.SUBTRACT)

    # Эскиз37 → Вырез-Вытянуть14 (cut, two sides: drawn at the far end of the back side and taken through both)
    with BuildSketch(Plane(origin=(0, 0, 1), x_dir=(-1, 0, 0), z_dir=(0, 0, -1)).offset(-CUT_EXTRUDE_14_DEPTH_BACK)):
        with Locations((0, 43)):
            Circle(SKETCH_37_R)
    extrude(amount=CUT_EXTRUDE_14_DEPTH + CUT_EXTRUDE_14_DEPTH_BACK, mode=Mode.SUBTRACT)

    # Фаска20
    chamfer_20_edges = [body_2_1.edges().sort_by_distance(p)[0] for p in [
        (3, 43, 1),
    ]]
    chamfer(chamfer_20_edges, length=CHAMFER_20_SIZE)

    # Эскиз29 → Вырез-Вытянуть15 (cut)
    with BuildSketch(Plane.XY.offset(8)):
        with Locations((-34, 17)):
            Circle(SKETCH_29_R)
        with Locations((-40, 1)):
            Circle(SKETCH_29_R)
        with Locations((34, 17)):
            Circle(SKETCH_29_R)
        with Locations((40, 1)):
            Circle(SKETCH_29_R)
    extrude(amount=-CUT_EXTRUDE_15_DEPTH, mode=Mode.SUBTRACT)

    # Эскиз38 → Бобышка-Вытянуть6 (add)
    with BuildSketch(Plane.XY.offset(8)):
        with BuildLine():
            ThreePointArc((-16, -27.712812921), (-32, 0), (-16, 27.712812921))
            Line((-16, 27.712812921), (-18.821530225, 27.712812921))
            ThreePointArc((-18.821530225, 27.712812921), (-33.459239875, -1.652049325), (-16, -29.432125306))
            Line((-16, -29.432125306), (-16, -27.712812921))
        make_face()
        with BuildLine():
            Line((18.821530225, 27.712812921), (16, 27.712812921))
            ThreePointArc((16, 27.712812921), (27.712812921, 16), (32, 0))
            ThreePointArc((32, 0), (27.712812921, -16), (16, -27.712812921))
            Line((16, -27.712812921), (16, -29.432125306))
            ThreePointArc((16, -29.432125306), (28.794530731, -17.120893668), (33.5, 0))
            ThreePointArc((33.5, 0), (29.603811094, 15.680062778), (18.821530225, 27.712812921))
        make_face()
    extrude(amount=EXTRUDE_6_DEPTH)


solid = body_2_1.part
